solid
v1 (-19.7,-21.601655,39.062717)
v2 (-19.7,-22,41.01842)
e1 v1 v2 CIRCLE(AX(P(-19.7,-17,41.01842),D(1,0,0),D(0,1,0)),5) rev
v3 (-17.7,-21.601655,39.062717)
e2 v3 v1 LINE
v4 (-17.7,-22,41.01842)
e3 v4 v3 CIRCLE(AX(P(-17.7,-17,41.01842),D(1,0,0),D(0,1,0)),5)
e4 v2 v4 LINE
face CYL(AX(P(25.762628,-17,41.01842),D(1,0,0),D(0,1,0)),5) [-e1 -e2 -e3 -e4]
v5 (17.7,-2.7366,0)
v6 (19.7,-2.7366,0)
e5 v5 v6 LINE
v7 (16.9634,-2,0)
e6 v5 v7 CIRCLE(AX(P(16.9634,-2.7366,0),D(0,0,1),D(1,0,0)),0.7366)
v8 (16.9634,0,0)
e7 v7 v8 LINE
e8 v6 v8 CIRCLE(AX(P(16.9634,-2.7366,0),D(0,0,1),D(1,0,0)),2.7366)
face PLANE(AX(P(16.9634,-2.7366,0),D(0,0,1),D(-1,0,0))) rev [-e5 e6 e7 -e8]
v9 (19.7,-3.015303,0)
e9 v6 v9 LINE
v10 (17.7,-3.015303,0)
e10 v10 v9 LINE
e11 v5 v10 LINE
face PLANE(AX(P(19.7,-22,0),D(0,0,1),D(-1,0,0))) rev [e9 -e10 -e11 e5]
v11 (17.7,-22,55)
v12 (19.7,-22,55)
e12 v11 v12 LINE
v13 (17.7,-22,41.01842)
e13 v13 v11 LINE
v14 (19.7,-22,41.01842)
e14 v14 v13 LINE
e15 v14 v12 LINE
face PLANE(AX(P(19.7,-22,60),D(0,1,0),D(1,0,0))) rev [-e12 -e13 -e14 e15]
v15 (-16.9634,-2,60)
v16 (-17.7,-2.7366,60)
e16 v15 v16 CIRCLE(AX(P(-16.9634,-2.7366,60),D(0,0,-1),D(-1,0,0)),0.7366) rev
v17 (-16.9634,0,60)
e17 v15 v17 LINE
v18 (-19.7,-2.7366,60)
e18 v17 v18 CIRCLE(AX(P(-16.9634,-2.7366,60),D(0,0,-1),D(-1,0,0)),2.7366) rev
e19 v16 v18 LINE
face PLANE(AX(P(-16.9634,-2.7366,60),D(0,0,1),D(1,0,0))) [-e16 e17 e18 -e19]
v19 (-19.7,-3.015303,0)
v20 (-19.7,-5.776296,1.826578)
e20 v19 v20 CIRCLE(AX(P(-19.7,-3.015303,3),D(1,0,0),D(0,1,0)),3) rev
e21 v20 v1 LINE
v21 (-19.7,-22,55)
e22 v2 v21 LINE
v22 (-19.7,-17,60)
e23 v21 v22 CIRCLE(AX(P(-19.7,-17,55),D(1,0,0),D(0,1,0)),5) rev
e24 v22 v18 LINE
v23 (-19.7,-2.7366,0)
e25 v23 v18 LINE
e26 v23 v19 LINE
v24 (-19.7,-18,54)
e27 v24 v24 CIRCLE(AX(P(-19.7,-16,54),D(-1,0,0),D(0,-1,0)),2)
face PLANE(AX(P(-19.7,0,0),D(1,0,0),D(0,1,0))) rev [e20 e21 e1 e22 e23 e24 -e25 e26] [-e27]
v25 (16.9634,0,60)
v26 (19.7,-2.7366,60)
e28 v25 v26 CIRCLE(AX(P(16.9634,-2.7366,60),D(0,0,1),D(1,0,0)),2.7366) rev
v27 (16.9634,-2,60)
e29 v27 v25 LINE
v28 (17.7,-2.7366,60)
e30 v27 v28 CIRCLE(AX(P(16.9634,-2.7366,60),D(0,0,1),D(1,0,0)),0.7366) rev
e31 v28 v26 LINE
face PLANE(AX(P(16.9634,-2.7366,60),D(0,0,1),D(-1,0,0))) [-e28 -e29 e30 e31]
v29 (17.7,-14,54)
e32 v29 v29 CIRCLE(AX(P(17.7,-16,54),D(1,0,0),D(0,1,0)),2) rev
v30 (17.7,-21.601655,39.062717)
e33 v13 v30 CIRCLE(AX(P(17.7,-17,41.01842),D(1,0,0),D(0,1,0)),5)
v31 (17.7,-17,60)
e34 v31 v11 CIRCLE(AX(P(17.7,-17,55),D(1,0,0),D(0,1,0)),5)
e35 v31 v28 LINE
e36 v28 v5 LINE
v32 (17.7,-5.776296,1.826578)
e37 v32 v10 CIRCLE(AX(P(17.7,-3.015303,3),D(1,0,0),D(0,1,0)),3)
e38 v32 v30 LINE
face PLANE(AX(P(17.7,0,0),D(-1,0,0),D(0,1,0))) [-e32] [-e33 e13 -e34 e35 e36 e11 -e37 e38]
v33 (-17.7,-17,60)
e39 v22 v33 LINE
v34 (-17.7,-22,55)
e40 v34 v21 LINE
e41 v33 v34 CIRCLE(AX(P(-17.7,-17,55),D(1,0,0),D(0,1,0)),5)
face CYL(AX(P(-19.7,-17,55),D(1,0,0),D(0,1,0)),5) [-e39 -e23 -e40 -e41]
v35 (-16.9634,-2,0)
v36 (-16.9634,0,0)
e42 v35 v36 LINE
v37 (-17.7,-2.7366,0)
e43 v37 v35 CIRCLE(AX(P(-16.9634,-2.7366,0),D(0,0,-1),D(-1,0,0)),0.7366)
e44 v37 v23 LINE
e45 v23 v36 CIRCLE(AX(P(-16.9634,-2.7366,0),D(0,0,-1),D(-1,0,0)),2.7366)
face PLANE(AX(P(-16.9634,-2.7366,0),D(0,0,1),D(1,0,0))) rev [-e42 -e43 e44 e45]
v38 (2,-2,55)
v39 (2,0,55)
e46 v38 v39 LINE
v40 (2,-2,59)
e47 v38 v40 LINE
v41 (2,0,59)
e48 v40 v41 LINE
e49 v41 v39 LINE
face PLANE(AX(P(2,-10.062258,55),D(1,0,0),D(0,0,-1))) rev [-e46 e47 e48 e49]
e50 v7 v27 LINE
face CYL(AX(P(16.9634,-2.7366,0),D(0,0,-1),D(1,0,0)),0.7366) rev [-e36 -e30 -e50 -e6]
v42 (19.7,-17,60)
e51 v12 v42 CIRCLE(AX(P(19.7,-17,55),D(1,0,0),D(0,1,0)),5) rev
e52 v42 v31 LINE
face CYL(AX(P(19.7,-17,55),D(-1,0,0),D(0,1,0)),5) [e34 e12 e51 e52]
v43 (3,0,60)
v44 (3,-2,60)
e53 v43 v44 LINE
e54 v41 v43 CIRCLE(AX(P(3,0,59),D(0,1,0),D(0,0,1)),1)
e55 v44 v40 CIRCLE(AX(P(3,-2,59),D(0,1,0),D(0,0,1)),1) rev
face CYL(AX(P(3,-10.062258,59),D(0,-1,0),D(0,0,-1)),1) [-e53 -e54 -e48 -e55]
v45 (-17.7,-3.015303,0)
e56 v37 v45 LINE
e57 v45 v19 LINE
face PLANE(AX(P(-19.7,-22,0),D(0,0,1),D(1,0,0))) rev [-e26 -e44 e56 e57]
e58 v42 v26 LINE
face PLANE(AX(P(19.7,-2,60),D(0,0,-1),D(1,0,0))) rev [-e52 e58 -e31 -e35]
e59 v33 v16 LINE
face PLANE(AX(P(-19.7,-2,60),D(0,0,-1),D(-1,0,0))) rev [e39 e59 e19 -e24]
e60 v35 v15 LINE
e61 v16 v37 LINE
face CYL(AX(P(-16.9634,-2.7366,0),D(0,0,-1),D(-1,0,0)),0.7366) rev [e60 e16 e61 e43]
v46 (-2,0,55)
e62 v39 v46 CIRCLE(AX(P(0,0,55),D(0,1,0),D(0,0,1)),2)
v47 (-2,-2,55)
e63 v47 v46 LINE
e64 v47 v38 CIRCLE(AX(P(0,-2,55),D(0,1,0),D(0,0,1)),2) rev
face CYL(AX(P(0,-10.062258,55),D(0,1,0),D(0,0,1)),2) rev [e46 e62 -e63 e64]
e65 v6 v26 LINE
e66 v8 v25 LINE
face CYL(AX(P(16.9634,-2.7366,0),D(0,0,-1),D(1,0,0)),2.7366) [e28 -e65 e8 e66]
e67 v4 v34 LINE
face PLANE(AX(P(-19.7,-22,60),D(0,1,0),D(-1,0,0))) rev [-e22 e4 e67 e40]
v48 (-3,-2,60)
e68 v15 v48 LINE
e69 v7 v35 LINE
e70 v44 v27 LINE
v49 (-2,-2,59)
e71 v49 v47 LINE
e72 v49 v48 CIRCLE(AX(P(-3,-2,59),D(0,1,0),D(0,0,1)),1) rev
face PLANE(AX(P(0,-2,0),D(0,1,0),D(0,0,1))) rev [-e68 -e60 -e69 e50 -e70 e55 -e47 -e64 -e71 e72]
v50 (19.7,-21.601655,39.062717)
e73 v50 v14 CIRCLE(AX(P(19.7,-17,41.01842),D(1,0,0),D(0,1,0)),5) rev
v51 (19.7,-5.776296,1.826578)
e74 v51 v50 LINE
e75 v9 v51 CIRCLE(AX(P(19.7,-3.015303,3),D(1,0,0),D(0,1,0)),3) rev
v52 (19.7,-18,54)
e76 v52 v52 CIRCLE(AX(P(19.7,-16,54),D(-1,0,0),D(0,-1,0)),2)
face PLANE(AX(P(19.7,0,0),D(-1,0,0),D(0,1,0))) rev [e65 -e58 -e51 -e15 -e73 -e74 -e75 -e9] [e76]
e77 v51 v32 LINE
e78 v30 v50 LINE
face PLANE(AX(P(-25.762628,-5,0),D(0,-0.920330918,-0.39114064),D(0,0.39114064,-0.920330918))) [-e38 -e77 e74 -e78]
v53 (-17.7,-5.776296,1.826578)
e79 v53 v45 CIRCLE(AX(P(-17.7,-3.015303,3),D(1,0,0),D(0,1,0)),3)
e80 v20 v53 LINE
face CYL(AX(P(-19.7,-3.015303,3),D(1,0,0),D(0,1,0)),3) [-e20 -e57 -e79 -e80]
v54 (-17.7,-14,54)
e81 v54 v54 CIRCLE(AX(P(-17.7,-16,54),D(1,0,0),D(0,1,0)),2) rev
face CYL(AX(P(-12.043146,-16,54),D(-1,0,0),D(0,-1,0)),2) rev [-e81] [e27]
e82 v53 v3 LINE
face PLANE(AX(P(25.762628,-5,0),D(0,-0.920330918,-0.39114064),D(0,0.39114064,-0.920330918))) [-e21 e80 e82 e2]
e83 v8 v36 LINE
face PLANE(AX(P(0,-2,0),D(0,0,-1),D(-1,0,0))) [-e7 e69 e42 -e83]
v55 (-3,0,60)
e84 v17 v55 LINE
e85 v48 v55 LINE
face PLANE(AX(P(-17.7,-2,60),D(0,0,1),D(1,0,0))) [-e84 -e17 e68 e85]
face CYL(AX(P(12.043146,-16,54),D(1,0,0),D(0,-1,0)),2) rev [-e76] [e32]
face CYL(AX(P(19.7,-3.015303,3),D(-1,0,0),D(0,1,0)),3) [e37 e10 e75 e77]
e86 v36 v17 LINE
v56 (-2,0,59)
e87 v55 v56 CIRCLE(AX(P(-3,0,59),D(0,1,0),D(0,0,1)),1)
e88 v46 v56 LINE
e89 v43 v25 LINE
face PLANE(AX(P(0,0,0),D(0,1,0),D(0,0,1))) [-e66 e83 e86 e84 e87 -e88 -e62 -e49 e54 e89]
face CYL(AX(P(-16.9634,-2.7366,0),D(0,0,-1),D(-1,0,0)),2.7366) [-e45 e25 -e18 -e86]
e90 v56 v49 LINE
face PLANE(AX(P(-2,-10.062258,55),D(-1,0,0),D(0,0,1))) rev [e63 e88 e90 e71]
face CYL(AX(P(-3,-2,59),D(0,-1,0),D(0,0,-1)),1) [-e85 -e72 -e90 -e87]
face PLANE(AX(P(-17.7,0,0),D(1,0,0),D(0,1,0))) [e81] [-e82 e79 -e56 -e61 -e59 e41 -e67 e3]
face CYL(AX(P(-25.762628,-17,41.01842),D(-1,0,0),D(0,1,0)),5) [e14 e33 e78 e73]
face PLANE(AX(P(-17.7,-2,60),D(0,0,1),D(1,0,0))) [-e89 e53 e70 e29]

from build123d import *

# Parameters (mm, degrees)
SKETCH1_W                    = 17.7
SKETCH1_H                    = 60
BASE_FLANGE2_DEPTH           = 2
EDGE_FLANGE2_STRIP_W         = 9.4732
EDGE_FLANGE2_STRIP_H         = 2
EDGE_FLANGE2_STRIP_CUT_DEPTH = 60
EDGE_FLANGE2_DEPTH           = 60
CUT_EXTRUDE5_DEPTH           = 2
FILLET4_R                    = 5
FILLET5_R                    = 3
SKETCH22_R                   = 2
CUT_EXTRUDE6_DEPTH           = 2
CUT_EXTRUDE7_DEPTH           = 2
FILLET6_R                    = 1


# Sheet-metal steps are written as plain solids
with BuildPart() as part:
    # Sketch1 → Base-Flange2 (new body)
    with BuildSketch(Plane(origin=(0, 0, 0), x_dir=(1, 0, 0), z_dir=(0, 1, 0))):
        with Locations((-8.85, -30)):
            Rectangle(SKETCH1_W, SKETCH1_H)
    extrude(amount=-BASE_FLANGE2_DEPTH)

    # Edge-Flange2 strip (across the edge) → Edge-Flange2 strip cut (cut)
    with BuildSketch(Plane(origin=(-17.7, -2, 60), x_dir=(1, 0, 0), z_dir=(0, 0, -1))):
        with Locations((-4, -1)):
            Rectangle(EDGE_FLANGE2_STRIP_W, EDGE_FLANGE2_STRIP_H)
    extrude(amount=EDGE_FLANGE2_STRIP_CUT_DEPTH, mode=Mode.SUBTRACT)

    # Edge-Flange2 section (across the edge) → Edge-Flange2 (add)
    with BuildSketch(Plane(origin=(-17.7, -2, 60), x_dir=(1, 0, 0), z_dir=(0, 0, -1))):
        with BuildLine():
            Line((-2, 0.7366), (-2, 20))
            Line((-2, 20), (0, 20))
            Line((0, 20), (0, 0.7366))
            ThreePointArc((0, 0.7366), (0.215745145, 0.215745145), (0.7366, 0))
            Line((0.7366, 0), (0.7366, -2))
            ThreePointArc((0.7366, -2), (-1.198468417, -1.198468417), (-2, 0.7366))
        make_face()
    extrude(amount=EDGE_FLANGE2_DEPTH)

    # Sketch20 → Cut-Extrude5 (cut)
    with BuildSketch(Plane.ZY.offset(19.7)):
        Polygon((0, -5), (40, -22), (0, -22), align=None)
    extrude(amount=-CUT_EXTRUDE5_DEPTH, mode=Mode.SUBTRACT)

    # Fillet4
    fillet4_edges = [part.edges().sort_by_distance(p)[0] for p in [
        (-18.7, -22, 60),
        (-18.7, -22, 40),
    ]]
    fillet(fillet4_edges, radius=FILLET4_R)

    # Fillet5
    fillet5_edges = [part.edges().sort_by_distance(p)[0] for p in [
        (-18.7, -5, 0),
    ]]
    fillet(fillet5_edges, radius=FILLET5_R)

    # Sketch22 → Cut-Extrude6 (cut)
    with BuildSketch(Plane.ZY.offset(19.7)):
        with Locations(Location((54, -16, 0), (0, 0, 270))):
            Circle(SKETCH22_R)
    extrude(amount=-CUT_EXTRUDE6_DEPTH, mode=Mode.SUBTRACT)

    # Mirror1: part across plane


with BuildPart() as part_1:
    add(part.part)
    add(part.part.mirror(Plane(origin=(0, -2, 60), x_dir=(0, 0, 1), z_dir=(1, 0, 0))))

    # Sketch28 → Cut-Extrude7 (cut)
    with BuildSketch(Plane(origin=(0, 0, 0), x_dir=(1, 0, 0), z_dir=(0, 1, 0))):
        with BuildLine():
            Line((2, -55), (2, -60))
            Line((2, -60), (-2, -60))
            Line((-2, -60), (-2, -55))
            ThreePointArc((-2, -55), (0, -53), (2, -55))
        make_face()
    extrude(amount=-CUT_EXTRUDE7_DEPTH, mode=Mode.SUBTRACT)

    # Fillet6
    fillet6_edges = [part_1.edges().sort_by_distance(p)[0] for p in [
        (2, -1, 60),
        (-2, -1, 60),
    ]]
    fillet(fillet6_edges, radius=FILLET6_R)


solid = part_1.part
